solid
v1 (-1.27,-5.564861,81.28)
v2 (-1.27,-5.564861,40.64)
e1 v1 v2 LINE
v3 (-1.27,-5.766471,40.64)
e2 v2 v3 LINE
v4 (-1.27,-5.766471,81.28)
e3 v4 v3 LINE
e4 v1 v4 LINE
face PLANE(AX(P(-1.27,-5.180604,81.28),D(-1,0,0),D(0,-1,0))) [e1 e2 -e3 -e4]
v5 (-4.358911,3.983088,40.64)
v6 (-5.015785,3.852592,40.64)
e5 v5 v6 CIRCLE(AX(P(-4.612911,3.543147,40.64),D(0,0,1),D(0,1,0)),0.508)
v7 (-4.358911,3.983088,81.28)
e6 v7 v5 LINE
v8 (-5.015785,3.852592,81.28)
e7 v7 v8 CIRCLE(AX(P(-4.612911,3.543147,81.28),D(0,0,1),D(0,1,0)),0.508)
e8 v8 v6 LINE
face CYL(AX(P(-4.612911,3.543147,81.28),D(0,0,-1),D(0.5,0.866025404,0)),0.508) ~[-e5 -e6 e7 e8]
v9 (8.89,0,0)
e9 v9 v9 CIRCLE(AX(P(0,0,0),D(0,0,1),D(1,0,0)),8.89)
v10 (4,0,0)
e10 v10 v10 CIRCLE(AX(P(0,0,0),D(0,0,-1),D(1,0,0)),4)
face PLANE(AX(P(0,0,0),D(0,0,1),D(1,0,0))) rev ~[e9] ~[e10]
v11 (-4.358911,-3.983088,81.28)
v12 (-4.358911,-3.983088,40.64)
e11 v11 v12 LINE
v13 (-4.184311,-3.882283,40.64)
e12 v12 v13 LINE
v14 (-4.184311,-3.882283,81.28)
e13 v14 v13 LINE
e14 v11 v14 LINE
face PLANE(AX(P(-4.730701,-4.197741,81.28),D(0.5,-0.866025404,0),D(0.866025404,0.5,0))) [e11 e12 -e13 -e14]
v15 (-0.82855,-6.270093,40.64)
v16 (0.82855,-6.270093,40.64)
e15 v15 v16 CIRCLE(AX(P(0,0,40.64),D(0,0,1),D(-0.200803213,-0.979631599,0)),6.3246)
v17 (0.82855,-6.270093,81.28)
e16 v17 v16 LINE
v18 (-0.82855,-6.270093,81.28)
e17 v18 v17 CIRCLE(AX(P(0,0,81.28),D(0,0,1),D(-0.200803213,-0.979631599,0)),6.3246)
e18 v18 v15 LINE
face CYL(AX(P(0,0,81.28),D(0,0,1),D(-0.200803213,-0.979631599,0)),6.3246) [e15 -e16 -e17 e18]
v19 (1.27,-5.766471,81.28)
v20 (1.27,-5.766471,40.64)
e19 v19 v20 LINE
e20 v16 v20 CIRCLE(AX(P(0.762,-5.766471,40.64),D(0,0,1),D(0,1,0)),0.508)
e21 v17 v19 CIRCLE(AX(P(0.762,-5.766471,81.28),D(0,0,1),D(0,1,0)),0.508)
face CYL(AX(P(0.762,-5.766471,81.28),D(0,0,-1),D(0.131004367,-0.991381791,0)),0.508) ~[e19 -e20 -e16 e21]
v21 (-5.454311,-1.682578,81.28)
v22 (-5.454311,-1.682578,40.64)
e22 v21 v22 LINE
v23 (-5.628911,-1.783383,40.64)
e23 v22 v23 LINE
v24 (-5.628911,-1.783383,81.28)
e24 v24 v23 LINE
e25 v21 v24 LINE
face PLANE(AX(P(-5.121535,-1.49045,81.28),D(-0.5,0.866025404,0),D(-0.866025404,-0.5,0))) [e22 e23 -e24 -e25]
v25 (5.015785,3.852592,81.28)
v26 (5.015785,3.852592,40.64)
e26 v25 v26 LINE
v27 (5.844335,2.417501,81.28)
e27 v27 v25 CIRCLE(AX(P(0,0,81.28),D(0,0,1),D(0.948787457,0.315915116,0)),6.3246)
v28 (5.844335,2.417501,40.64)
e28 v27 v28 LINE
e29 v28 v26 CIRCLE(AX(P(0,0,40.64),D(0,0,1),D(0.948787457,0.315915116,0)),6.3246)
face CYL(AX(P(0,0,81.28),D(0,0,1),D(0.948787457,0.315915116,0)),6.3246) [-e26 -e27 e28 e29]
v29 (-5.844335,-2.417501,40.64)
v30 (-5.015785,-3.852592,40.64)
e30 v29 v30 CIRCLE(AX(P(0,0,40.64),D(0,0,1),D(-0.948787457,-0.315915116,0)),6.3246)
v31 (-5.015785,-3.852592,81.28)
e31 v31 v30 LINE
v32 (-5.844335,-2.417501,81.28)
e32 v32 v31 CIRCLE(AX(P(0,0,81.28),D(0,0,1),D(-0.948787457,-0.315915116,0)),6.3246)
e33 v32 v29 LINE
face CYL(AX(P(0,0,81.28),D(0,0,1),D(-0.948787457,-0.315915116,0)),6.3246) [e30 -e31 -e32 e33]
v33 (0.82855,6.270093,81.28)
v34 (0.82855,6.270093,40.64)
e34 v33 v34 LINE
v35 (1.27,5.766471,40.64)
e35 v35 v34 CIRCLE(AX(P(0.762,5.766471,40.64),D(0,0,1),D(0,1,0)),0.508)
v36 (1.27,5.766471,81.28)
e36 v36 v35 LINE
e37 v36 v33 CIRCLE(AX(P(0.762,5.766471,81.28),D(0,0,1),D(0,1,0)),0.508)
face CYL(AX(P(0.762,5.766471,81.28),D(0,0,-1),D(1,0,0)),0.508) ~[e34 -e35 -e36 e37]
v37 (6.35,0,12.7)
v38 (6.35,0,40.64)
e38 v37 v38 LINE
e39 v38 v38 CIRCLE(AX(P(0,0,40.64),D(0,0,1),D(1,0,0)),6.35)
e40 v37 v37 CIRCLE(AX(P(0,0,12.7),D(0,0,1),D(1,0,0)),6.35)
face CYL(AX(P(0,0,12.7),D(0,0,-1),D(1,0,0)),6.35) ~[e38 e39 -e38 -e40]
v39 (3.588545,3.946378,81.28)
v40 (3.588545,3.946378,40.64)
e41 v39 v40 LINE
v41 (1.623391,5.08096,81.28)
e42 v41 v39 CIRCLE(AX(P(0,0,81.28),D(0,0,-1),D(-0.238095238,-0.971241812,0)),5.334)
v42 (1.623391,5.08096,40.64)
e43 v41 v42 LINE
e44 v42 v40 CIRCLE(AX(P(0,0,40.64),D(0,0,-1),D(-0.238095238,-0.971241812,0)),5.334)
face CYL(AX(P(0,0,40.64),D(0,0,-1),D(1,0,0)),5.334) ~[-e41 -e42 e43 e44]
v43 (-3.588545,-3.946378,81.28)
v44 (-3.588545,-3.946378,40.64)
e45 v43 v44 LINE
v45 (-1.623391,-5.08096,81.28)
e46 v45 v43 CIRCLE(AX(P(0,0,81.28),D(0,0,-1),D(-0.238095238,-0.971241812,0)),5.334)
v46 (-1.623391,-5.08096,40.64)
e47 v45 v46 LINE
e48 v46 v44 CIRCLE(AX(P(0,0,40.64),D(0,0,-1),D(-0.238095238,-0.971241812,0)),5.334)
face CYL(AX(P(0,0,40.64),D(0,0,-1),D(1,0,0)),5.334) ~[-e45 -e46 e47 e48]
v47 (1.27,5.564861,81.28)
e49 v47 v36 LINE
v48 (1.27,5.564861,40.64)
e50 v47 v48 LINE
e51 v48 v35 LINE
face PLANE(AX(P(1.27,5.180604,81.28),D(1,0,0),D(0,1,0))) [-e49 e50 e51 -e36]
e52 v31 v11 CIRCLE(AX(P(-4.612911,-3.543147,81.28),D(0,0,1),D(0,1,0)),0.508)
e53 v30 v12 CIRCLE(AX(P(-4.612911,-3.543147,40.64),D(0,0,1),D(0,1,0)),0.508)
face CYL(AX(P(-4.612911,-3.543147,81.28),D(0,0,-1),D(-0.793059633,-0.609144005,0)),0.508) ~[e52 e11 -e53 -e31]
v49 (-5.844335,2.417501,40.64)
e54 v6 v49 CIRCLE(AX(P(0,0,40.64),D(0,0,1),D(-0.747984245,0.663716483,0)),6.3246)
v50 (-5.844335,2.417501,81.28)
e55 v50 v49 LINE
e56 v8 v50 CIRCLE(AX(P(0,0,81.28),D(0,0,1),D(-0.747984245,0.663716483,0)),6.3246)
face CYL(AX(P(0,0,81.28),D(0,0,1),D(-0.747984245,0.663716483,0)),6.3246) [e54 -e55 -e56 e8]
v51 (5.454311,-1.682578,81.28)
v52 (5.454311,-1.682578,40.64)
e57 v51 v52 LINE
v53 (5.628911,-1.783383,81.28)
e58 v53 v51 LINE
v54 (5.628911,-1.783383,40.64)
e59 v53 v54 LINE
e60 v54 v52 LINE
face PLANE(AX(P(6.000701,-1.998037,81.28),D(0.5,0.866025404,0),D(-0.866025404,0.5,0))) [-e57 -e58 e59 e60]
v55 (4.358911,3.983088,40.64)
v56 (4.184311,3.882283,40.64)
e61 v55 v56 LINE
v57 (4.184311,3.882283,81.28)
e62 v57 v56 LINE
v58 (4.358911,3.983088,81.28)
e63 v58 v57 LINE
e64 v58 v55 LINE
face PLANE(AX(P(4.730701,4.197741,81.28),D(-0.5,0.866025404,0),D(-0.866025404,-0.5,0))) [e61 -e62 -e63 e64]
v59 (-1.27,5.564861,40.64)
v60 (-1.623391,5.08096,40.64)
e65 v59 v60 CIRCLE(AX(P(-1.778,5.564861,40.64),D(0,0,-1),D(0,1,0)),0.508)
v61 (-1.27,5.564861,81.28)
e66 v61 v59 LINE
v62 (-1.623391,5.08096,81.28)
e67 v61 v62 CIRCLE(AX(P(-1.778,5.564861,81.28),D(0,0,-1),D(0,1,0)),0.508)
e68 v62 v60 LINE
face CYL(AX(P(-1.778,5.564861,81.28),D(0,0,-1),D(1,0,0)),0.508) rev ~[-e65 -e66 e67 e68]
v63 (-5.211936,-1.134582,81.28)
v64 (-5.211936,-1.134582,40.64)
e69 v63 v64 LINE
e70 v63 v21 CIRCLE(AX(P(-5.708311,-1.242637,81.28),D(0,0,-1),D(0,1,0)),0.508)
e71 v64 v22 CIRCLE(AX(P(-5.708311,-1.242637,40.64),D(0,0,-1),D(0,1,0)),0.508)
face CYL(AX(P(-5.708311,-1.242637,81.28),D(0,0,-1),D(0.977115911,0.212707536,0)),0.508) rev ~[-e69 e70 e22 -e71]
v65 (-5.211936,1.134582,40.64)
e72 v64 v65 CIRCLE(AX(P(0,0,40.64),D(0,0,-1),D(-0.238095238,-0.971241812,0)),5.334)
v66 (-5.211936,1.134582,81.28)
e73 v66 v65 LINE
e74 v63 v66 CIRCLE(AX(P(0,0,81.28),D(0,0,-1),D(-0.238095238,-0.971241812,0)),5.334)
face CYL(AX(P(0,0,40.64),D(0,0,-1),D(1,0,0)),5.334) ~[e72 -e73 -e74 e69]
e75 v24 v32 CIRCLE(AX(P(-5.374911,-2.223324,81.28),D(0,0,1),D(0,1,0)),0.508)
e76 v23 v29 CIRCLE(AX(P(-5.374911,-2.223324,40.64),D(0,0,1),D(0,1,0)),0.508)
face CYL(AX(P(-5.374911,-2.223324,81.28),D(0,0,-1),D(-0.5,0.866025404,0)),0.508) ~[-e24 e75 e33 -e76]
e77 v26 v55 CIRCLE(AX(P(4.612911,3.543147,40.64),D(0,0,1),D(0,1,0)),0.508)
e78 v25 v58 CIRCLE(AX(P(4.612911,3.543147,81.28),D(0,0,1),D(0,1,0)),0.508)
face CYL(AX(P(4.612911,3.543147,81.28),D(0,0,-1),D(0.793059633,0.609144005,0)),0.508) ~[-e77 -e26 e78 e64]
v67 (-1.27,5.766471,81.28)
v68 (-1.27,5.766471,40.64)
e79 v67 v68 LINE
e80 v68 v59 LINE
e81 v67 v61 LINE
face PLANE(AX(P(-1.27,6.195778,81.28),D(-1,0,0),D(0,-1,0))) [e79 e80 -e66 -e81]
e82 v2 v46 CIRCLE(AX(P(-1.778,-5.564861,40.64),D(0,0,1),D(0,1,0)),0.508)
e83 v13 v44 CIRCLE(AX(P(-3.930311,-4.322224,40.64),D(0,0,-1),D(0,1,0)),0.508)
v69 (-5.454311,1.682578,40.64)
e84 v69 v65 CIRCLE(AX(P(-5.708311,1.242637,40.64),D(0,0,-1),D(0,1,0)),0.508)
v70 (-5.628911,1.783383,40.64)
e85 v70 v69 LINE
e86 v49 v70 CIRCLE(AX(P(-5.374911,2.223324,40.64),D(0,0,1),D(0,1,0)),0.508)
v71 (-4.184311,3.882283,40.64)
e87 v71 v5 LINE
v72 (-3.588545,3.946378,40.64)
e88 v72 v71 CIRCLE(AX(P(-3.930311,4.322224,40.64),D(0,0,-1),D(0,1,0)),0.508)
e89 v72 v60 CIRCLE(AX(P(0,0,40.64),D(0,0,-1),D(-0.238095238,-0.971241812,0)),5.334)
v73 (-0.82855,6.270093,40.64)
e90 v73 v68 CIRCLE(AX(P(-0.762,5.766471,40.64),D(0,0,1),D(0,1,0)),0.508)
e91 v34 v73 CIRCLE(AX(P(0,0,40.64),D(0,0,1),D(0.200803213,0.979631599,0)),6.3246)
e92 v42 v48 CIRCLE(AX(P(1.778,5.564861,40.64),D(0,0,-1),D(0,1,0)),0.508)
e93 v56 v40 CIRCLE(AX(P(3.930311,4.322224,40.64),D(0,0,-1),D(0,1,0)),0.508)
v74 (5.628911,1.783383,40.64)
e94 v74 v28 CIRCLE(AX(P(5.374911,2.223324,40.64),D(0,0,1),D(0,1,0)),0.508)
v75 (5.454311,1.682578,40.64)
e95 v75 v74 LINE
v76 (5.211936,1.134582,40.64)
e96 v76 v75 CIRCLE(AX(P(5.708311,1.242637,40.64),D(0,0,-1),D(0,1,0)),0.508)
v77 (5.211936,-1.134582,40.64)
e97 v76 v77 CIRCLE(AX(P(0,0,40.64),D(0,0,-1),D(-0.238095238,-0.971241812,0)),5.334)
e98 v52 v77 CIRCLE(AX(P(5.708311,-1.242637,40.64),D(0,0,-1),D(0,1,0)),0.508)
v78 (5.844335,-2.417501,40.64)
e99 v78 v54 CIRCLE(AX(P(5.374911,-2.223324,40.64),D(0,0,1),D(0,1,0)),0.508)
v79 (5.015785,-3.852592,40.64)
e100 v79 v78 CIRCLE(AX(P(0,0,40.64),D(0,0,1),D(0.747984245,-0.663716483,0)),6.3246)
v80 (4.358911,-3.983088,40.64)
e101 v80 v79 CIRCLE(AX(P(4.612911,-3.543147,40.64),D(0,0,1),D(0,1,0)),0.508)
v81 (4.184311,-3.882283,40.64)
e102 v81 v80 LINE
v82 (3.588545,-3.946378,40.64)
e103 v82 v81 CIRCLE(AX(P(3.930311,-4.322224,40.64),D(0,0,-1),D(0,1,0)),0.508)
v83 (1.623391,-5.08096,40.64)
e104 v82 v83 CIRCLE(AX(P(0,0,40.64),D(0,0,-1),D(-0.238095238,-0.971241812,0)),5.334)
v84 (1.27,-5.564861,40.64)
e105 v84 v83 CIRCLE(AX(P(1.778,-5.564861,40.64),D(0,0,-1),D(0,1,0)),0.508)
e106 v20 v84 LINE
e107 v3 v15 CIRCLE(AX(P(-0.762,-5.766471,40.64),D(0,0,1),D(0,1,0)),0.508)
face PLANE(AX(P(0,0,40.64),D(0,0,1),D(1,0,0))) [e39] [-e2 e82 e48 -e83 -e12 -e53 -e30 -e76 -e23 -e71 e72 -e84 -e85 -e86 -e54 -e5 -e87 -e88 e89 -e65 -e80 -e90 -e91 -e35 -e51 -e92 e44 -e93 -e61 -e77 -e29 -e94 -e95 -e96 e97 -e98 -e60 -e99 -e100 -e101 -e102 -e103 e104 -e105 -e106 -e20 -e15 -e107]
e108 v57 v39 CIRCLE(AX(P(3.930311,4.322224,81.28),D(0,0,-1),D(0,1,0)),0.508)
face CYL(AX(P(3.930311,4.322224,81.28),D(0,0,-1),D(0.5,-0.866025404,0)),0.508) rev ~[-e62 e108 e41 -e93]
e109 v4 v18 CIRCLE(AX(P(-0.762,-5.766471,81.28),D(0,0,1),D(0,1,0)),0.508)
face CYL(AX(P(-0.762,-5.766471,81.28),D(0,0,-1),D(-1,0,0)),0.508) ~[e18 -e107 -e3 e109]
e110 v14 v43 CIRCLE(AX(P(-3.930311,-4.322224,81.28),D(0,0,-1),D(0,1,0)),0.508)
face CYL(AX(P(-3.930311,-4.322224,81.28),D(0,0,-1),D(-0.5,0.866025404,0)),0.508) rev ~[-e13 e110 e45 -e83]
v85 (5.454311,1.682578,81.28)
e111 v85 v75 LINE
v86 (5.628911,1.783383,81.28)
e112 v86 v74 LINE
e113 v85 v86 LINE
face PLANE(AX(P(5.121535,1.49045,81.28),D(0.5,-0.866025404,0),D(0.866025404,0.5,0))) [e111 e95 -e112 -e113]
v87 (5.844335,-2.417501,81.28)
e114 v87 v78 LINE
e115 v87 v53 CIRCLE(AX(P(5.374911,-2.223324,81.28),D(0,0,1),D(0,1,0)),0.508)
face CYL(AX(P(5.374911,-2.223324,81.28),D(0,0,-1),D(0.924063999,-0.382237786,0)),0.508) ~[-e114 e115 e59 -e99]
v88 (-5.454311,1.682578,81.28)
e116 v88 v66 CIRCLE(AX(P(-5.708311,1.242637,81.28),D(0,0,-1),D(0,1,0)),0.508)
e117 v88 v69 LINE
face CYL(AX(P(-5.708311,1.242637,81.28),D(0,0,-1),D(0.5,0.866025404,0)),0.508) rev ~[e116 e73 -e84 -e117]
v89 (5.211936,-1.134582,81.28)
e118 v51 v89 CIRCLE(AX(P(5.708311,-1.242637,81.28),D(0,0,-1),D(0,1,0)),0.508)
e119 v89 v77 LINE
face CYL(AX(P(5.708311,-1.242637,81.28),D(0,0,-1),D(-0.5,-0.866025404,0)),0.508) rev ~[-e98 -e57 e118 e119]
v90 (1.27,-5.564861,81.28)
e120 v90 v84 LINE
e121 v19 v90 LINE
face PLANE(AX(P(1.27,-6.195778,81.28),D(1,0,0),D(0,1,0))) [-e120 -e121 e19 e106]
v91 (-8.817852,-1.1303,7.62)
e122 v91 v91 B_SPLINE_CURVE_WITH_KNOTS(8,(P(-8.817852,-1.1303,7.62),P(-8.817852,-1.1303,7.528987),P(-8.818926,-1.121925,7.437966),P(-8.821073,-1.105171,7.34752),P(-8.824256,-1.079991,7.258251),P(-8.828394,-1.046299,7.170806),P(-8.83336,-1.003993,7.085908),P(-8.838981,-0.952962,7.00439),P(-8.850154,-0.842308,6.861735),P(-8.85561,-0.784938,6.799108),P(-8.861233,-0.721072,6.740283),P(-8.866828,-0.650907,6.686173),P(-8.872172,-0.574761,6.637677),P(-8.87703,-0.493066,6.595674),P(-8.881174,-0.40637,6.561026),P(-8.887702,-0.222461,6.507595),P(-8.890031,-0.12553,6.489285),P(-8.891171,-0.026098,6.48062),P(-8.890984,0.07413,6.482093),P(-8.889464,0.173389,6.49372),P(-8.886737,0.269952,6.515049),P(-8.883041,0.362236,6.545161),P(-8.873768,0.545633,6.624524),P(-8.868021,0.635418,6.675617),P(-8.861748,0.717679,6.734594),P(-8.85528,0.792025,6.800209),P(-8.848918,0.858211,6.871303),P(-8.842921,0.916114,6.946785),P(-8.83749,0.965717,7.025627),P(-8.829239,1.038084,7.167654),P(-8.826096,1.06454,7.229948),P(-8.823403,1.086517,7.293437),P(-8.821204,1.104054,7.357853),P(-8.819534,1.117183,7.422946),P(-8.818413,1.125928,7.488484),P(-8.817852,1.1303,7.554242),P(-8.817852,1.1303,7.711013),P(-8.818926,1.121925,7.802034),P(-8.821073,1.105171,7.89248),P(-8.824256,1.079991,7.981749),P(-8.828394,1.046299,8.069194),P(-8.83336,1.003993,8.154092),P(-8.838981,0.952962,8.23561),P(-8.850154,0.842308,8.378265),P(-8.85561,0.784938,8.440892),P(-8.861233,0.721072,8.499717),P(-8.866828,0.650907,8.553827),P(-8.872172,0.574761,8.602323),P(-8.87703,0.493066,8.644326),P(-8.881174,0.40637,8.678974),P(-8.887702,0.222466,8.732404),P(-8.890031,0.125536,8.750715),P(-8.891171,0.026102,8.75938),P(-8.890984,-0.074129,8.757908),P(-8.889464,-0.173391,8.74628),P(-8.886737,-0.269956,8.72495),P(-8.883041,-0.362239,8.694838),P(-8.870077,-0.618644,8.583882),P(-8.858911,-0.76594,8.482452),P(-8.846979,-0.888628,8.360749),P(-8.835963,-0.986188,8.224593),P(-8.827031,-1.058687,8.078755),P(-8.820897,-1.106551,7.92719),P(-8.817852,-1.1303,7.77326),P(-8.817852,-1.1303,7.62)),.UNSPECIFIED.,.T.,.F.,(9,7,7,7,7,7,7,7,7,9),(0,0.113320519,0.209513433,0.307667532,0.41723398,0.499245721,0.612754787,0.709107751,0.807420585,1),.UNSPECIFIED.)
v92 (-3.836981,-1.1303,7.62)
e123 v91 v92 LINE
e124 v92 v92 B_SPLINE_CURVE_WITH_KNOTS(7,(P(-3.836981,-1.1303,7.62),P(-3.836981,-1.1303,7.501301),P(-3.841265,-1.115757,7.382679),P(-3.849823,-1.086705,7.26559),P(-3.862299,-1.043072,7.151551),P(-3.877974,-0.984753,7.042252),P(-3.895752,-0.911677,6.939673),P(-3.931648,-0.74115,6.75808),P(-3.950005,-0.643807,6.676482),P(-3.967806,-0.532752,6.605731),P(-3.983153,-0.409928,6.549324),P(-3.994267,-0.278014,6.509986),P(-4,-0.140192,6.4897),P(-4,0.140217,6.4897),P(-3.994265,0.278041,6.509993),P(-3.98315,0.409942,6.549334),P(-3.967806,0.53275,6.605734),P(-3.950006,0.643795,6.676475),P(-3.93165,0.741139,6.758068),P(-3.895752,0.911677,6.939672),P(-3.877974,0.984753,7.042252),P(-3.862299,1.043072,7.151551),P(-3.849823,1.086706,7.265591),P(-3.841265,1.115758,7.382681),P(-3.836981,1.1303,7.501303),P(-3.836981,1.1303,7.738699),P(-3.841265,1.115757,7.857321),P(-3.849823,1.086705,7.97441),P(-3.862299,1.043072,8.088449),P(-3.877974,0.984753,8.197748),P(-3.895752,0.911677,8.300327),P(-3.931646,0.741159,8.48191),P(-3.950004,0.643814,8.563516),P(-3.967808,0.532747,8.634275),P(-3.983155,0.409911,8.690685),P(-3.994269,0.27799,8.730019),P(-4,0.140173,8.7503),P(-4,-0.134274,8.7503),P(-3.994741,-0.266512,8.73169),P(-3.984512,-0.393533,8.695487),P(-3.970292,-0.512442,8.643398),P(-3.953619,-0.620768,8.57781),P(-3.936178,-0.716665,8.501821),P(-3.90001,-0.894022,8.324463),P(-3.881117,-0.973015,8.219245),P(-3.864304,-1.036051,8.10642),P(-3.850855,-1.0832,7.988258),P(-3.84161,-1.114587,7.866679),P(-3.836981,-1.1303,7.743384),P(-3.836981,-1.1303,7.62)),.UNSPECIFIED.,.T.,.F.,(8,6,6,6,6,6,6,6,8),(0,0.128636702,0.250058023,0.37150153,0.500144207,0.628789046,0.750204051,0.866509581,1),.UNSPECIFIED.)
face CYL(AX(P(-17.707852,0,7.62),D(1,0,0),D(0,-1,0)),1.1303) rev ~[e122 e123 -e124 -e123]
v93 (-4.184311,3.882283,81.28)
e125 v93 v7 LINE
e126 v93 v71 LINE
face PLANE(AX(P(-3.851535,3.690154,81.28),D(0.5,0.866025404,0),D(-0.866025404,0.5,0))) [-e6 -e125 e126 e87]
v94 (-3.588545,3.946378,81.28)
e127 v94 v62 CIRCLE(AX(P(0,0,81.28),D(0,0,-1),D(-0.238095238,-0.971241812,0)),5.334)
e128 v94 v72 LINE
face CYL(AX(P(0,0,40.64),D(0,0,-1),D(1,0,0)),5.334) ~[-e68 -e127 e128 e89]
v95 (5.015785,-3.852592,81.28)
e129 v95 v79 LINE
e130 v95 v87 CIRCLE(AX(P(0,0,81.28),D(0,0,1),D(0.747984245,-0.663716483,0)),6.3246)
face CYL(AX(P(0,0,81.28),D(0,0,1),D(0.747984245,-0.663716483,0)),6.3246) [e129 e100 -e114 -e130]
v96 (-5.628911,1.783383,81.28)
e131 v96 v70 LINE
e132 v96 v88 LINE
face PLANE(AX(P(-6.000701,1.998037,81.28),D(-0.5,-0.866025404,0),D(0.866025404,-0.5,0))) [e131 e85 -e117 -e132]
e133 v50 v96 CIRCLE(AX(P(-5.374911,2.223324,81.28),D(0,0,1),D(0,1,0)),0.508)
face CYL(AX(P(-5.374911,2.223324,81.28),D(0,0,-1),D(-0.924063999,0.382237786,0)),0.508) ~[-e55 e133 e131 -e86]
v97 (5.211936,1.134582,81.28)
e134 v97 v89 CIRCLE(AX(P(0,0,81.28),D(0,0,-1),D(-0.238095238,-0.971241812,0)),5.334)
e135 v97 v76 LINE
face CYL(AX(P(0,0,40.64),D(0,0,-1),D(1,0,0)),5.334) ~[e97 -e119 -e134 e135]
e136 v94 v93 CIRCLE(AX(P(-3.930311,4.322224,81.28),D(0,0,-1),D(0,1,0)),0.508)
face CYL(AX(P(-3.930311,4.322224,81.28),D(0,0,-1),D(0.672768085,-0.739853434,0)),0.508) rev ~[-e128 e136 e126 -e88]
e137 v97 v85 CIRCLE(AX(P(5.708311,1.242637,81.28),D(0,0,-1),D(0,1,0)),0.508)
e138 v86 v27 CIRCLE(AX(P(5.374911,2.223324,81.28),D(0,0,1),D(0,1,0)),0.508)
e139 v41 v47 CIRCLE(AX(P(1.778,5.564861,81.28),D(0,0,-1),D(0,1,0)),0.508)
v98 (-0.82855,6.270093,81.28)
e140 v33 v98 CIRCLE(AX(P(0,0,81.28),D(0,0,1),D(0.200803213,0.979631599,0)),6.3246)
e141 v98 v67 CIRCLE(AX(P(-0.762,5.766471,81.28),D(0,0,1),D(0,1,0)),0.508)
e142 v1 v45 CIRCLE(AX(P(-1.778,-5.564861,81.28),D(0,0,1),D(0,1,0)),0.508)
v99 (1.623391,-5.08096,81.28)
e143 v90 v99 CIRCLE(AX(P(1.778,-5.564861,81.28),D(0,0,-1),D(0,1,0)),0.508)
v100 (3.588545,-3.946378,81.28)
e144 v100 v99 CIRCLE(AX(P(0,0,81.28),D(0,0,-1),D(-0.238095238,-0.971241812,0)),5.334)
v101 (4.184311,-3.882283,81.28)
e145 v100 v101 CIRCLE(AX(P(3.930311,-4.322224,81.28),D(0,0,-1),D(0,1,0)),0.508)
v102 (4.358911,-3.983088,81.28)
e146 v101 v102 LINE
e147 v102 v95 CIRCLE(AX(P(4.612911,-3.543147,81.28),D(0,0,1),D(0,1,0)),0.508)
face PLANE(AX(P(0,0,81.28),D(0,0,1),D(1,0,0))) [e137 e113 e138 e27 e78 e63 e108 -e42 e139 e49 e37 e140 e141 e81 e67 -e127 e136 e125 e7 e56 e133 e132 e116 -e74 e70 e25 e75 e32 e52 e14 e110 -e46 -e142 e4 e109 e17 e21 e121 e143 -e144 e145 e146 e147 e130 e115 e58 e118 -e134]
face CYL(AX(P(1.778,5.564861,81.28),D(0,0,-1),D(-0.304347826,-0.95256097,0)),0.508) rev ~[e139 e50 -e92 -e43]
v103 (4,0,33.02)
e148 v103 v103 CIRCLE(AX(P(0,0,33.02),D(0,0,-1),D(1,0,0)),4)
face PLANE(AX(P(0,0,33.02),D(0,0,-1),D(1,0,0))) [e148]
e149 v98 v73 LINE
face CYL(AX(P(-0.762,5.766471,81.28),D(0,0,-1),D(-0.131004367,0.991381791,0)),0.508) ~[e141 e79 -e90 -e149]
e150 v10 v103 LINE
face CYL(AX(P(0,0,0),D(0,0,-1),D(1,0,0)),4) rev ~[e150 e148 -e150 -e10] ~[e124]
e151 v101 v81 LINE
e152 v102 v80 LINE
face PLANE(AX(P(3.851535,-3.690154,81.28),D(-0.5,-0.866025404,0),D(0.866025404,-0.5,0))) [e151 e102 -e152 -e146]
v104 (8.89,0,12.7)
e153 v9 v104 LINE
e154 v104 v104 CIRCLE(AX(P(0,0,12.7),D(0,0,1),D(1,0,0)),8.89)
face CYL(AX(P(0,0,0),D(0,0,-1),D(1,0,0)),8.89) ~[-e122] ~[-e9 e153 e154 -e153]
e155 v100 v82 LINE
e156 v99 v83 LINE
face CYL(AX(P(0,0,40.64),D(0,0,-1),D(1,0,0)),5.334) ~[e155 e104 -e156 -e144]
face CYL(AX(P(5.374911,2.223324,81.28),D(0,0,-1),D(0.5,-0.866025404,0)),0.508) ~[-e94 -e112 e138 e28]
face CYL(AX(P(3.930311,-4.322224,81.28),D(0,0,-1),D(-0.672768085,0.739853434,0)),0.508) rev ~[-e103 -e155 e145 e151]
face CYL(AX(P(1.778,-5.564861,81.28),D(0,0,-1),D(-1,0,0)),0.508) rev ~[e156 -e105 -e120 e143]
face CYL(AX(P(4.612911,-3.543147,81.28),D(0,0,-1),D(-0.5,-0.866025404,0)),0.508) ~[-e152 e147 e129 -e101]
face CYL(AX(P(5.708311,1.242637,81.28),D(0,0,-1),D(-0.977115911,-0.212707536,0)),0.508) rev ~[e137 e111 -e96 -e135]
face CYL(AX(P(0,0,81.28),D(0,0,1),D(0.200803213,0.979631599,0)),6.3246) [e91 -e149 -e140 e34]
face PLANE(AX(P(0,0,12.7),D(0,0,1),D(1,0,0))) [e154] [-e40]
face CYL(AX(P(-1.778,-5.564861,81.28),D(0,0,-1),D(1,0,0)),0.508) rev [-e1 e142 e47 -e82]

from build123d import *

# Parameters (mm, degrees)
F0_R            = 8.89
F1_DEPTH        = 12.7
F2_R            = 6.35
F3_DEPTH        = 27.94
F4_R            = 5.334
F5_DEPTH        = 40.64
F7_DEPTH        = 40.64
F7_COPIES_COUNT = 6
F8_R            = 0.508
F9_R            = 4
F10_DEPTH       = 33.02
F14_D           = 2.2606
F14_DEPTH       = 8.89
F14_START       = 0.0721476
F14_TIP         = 0.6791527577


# Not quite as in the source:
# - a pattern or mirror of a feature is missing from the dataset's text; its kind, count and spacing are read off the source's solid


with BuildPart() as f1:
    # F0 (on Top) → F1 (new body)
    with BuildSketch(Plane.XY):
        Circle(F0_R)
    extrude(amount=F1_DEPTH)

    # F2 (on face) → F3 (join)
    with BuildSketch(Plane.XY.offset(12.7)):
        Circle(F2_R)
    extrude(amount=F3_DEPTH)

    # F4 (on face) → F5 (join)
    with BuildSketch(Plane.XY.offset(40.64)):
        Circle(F4_R)
    extrude(amount=F5_DEPTH)

    # F6 (on face) → F7 (join, through all)
    with BuildSketch(Plane.XY.offset(81.28)):
        with BuildLine():
            Line((-1.27, -5.1806038258), (-1.27, -6.1957780109))
            ThreePointArc((-1.27, -6.1957780109), (0, -6.3246), (1.27, -6.1957780109))
            Line((1.27, -6.1957780109), (1.27, -5.1806038258))
            ThreePointArc((1.27, -5.1806038258), (0, -5.334), (-1.27, -5.1806038258))
        make_face()
    f7 = extrude(amount=-F7_DEPTH)

    # F7_copies: F7 ×6 about axis
    f7_copies_axis = Axis((0, 0, 0), (0, 0, 1))
    for i in range(1, F7_COPIES_COUNT):
        add(f7.rotate(f7_copies_axis, i * 360 / F7_COPIES_COUNT))

    # F8
    f8_edges = [f1.edges().sort_by_distance(p)[0] for p in [
        (1.27, -6.195778, 60.96),
        (1.27, -5.180604, 60.96),
        (-1.27, -6.195778, 60.96),
        (-1.27, -5.180604, 60.96),
        (3.851535, -3.690154, 60.96),
        (4.730701, -4.197741, 60.96),
        (6.000701, -1.998037, 60.96),
        (5.121535, -1.49045, 60.96),
        (5.121535, 1.49045, 60.96),
        (6.000701, 1.998037, 60.96),
        (4.730701, 4.197741, 60.96),
        (3.851535, 3.690154, 60.96),
        (1.27, 5.180604, 60.96),
        (1.27, 6.195778, 60.96),
        (-1.27, 6.195778, 60.96),
        (-1.27, 5.180604, 60.96),
        (-3.851535, 3.690154, 60.96),
        (-4.730701, 4.197741, 60.96),
        (-6.000701, 1.998037, 60.96),
        (-5.121535, 1.49045, 60.96),
        (-5.121535, -1.49045, 60.96),
        (-6.000701, -1.998037, 60.96),
        (-4.730701, -4.197741, 60.96),
        (-3.851535, -3.690154, 60.96),
    ]]
    fillet(f8_edges, radius=F8_R)

    # F9 (on face) → F10 (cut)
    with BuildSketch(Plane(origin=(0, 0, 0), x_dir=(1, 0, 0), z_dir=(0, 0, -1))):
        Circle(F9_R)
    extrude(amount=-F10_DEPTH, mode=Mode.SUBTRACT)

    # F14
    # its depths count from where the whole tool has entered the part; down to there all is cleared
    with Locations(Plane(origin=(-8.89, 0, 0), x_dir=(0, 1, 0), z_dir=(-1, 0, 0)).offset(-F14_START)):
        with Locations((0, -7.62)):
            Hole(F14_D / 2, depth=F14_DEPTH)
            with Locations((0, 0, -(F14_DEPTH + F14_TIP / 2))):  # 118° drill point
                Cone(0, F14_D / 2, F14_TIP, mode=Mode.SUBTRACT)


solid = f1.part
